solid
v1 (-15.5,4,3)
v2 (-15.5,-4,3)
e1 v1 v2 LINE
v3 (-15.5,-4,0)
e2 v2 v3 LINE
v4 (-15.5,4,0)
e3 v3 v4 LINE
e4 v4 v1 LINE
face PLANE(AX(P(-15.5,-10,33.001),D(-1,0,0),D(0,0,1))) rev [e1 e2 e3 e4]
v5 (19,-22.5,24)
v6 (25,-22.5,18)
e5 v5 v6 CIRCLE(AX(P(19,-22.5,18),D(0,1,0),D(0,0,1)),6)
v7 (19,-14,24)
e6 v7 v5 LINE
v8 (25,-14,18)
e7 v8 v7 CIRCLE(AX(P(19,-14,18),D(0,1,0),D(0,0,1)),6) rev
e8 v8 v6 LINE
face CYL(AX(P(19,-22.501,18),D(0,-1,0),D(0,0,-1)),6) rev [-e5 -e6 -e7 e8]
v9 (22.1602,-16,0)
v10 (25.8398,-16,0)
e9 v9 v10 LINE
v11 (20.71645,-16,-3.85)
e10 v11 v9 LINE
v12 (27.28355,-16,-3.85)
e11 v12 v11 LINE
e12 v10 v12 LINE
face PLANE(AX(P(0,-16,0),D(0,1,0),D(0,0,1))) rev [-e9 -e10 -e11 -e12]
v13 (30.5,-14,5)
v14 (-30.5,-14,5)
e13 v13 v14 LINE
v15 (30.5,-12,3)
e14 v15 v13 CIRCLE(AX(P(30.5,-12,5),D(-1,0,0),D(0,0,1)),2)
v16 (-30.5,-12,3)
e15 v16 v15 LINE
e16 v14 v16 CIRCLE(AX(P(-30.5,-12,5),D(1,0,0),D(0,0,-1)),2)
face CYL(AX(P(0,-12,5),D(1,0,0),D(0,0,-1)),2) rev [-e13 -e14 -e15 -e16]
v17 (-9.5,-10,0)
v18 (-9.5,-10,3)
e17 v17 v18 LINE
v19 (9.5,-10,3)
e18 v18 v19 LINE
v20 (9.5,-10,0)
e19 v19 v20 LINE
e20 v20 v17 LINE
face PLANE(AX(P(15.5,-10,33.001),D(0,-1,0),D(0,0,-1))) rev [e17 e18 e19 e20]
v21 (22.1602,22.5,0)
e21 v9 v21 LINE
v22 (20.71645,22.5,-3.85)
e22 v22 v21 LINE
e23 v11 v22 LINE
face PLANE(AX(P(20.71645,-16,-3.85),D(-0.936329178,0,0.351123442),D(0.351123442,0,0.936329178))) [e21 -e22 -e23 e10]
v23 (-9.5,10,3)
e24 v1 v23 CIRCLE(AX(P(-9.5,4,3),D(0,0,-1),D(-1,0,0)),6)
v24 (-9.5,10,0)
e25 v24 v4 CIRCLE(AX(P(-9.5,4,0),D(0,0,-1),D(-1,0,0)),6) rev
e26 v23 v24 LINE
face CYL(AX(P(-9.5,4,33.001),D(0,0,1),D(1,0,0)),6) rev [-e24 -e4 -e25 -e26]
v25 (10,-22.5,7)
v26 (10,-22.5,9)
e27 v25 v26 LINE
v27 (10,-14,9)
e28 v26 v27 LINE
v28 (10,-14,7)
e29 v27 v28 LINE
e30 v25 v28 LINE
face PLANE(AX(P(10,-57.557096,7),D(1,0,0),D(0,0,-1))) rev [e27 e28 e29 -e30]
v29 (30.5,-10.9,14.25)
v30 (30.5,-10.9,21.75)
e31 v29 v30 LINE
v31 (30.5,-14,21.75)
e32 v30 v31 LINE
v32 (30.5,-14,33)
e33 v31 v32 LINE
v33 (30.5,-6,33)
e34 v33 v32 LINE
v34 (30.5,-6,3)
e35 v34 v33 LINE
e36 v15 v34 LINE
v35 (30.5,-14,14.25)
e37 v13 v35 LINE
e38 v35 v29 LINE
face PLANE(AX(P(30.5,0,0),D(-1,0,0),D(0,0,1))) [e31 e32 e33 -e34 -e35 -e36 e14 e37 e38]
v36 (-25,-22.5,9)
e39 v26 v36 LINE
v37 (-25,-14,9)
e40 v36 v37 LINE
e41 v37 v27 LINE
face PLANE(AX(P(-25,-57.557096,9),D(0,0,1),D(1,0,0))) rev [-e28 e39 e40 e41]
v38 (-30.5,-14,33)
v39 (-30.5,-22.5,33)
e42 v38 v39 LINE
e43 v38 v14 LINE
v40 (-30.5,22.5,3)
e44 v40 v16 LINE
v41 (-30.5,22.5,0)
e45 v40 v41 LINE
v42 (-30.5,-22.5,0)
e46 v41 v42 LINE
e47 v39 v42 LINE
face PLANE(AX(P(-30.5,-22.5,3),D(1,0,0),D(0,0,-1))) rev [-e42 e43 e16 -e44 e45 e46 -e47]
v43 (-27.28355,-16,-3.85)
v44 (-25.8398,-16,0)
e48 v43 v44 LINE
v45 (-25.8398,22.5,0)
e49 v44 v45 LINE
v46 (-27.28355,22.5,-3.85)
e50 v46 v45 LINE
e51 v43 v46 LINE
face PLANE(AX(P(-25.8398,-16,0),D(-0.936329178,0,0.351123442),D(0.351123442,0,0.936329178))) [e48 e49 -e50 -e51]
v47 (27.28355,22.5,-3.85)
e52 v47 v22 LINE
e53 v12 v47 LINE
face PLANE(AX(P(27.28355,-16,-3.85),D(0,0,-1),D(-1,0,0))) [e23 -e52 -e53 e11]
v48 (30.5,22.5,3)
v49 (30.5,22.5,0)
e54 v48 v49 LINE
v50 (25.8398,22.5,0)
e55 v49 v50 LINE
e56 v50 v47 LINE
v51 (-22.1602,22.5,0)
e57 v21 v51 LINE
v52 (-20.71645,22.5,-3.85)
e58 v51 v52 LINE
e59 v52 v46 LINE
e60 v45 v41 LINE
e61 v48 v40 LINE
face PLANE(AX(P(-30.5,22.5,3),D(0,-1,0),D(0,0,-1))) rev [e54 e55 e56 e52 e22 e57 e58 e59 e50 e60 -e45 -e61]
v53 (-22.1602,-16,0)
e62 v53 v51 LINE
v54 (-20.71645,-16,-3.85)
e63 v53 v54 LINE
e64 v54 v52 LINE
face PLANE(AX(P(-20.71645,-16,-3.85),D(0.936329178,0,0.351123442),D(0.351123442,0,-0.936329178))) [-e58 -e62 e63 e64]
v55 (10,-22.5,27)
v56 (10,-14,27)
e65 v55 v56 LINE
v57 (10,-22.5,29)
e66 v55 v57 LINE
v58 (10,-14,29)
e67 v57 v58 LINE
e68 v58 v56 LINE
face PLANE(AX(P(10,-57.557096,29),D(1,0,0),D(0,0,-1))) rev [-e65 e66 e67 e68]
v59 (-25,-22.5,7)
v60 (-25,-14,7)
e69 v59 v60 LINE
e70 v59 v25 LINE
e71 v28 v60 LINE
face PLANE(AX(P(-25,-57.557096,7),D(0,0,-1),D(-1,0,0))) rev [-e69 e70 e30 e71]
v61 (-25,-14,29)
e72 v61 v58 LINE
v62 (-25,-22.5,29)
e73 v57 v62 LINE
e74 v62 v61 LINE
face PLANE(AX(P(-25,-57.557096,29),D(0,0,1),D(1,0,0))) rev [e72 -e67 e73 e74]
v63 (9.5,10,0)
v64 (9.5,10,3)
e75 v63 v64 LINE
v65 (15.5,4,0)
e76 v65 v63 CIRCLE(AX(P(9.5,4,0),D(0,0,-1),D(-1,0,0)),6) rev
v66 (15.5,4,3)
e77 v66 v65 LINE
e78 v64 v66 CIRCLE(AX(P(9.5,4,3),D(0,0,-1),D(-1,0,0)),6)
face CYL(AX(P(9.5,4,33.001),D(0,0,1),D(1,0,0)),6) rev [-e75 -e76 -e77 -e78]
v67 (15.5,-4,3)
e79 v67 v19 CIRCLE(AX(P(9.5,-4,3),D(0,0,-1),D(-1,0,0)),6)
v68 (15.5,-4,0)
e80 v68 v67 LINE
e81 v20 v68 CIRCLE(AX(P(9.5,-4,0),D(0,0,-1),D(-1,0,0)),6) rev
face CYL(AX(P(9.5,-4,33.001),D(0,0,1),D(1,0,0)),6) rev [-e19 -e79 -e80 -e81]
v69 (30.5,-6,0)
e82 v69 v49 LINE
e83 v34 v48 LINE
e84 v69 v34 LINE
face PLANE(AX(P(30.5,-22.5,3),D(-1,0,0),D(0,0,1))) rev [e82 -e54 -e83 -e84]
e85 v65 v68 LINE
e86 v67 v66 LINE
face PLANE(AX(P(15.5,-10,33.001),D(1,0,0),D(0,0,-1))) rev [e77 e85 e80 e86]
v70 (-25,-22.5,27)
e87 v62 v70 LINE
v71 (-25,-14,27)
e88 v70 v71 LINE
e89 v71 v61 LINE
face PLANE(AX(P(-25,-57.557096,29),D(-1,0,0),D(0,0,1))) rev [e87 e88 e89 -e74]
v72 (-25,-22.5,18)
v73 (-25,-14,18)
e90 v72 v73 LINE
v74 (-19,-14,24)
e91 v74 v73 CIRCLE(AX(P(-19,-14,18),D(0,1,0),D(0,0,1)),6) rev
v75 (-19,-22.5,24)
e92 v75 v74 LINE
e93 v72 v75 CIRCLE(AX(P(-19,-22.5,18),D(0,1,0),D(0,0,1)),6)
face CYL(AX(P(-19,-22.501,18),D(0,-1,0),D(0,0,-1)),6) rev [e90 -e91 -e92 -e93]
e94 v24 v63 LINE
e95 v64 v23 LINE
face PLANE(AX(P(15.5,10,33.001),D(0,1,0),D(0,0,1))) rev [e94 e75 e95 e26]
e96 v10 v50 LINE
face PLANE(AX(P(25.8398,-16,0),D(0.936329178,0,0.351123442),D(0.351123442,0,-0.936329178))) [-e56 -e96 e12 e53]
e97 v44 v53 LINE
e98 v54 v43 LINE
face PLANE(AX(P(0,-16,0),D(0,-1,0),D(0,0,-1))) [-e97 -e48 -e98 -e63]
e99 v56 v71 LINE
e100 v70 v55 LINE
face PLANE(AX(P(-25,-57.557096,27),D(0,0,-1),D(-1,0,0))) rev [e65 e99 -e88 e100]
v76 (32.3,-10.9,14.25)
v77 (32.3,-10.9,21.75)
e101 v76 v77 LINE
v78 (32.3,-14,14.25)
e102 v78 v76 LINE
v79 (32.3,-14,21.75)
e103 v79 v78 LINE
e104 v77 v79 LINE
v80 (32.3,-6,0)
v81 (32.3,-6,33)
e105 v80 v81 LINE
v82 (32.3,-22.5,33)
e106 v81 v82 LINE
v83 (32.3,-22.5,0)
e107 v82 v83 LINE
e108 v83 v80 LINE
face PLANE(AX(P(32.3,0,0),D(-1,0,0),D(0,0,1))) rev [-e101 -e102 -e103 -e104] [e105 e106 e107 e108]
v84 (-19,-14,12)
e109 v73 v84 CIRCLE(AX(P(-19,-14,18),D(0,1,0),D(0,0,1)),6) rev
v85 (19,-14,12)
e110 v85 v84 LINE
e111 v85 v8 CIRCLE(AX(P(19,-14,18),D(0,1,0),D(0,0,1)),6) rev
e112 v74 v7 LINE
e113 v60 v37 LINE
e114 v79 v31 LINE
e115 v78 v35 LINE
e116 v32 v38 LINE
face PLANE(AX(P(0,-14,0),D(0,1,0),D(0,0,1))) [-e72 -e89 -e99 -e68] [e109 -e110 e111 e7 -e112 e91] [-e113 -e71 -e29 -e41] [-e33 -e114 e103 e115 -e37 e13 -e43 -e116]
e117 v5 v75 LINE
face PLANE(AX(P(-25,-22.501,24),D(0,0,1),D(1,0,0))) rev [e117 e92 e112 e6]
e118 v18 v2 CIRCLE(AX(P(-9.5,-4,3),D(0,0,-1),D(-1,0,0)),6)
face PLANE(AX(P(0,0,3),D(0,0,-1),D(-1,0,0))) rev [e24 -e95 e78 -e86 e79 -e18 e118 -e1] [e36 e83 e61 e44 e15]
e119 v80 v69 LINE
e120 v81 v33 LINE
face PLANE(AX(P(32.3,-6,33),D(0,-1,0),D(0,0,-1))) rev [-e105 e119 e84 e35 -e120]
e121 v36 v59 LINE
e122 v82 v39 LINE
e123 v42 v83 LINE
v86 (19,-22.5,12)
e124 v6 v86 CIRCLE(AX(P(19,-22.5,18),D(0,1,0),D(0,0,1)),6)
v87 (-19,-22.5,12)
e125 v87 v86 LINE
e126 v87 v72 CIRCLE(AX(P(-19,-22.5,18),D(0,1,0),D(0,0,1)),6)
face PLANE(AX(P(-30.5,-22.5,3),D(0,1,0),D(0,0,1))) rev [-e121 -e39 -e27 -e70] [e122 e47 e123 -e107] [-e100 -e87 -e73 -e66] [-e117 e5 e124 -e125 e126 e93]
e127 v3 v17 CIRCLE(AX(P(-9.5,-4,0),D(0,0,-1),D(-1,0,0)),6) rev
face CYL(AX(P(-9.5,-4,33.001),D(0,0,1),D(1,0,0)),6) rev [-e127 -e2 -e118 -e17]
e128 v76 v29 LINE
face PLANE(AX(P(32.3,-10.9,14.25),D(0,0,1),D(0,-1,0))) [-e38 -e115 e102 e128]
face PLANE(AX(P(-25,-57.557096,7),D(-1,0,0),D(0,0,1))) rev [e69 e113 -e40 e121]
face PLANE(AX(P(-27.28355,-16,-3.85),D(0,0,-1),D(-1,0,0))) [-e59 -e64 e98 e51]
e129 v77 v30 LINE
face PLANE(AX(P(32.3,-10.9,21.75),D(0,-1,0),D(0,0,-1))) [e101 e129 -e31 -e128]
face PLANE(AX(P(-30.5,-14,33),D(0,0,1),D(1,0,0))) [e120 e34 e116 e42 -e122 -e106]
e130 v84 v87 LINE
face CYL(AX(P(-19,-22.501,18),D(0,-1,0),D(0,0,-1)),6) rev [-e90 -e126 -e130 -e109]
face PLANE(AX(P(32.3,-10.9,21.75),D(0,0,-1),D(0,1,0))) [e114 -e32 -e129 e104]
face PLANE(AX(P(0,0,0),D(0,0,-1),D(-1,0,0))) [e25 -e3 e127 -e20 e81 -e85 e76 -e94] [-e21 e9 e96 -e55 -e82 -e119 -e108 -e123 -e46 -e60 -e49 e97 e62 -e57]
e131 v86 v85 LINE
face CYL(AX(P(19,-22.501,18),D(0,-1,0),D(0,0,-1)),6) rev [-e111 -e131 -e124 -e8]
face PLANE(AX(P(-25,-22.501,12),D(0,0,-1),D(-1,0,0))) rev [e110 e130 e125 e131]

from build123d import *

# Parameters (mm, degrees)
SKETCH1_W           = 61
SKETCH1_H           = 45
BOSS_EXTRUDE1_DEPTH = 3
BOSS_EXTRUDE2_DEPTH = 38.5
SKETCH3_W           = 61
SKETCH3_H           = 30
BOSS_EXTRUDE3_DEPTH = 8.5
SKETCH4_W           = 35
SKETCH4_H           = 2
CUT_EXTRUDE1_DEPTH  = 8.5
SKETCH5_W           = 33
SKETCH5_H           = 16.5
SKETCH5_W_2         = 7.5
SKETCH5_H_2         = 3.1
BOSS_EXTRUDE4_DEPTH = 1.8
CUT_EXTRUDE2_REACH  = 60.86
SKETCH6_W           = 50
SKETCH6_H           = 12
CUT_EXTRUDE3_REACH  = 53.367
SKETCH7_W           = 31
SKETCH7_H           = 20
FILLET1_R           = 6
FILLET2_R           = 2


with BuildPart() as part:
    # Sketch1 → Boss-Extrude1 (new body)
    with BuildSketch(Plane.XY):
        Rectangle(SKETCH1_W, SKETCH1_H)
    extrude(amount=BOSS_EXTRUDE1_DEPTH)

    # Sketch2 → Boss-Extrude2 (add)
    with BuildSketch(Plane(origin=(0, 22.5, 0), x_dir=(1, 0, 0), z_dir=(0, 1, 0))):
        Polygon((-25.83979993, 0), (-27.28354993, 3.85), (-20.71645007, 3.85), (-22.16020007, 0), align=None)
        Polygon((20.71645007, 3.85), (22.16020007, 0), (25.83979993, 0), (27.28354993, 3.85), align=None)
    extrude(amount=-BOSS_EXTRUDE2_DEPTH)

    # Sketch3 → Boss-Extrude3 (add)
    with BuildSketch(Plane.XZ.offset(22.5)):
        with Locations((0, 18)):
            Rectangle(SKETCH3_W, SKETCH3_H)
    extrude(amount=-BOSS_EXTRUDE3_DEPTH)

    # Sketch4 → Cut-Extrude1 (cut)
    with BuildSketch(Plane(origin=(0, -14, 0), x_dir=(1, 0, 0), z_dir=(0, 1, 0))):
        with Locations((-7.5, -8)):
            Rectangle(SKETCH4_W, SKETCH4_H)
        with Locations((-7.5, -28)):
            Rectangle(SKETCH4_W, SKETCH4_H)
    extrude(amount=-CUT_EXTRUDE1_DEPTH, mode=Mode.SUBTRACT)

    # Sketch5 → Boss-Extrude4 (add)
    with BuildSketch(Plane(origin=(30.5, 0, 0), x_dir=(0, 0, -1), z_dir=(1, 0, 0))):
        with Locations((-16.5, -14.25)):
            Rectangle(SKETCH5_W, SKETCH5_H)
        with Locations((-18, -12.45)):
            Rectangle(SKETCH5_W_2, SKETCH5_H_2, mode=Mode.SUBTRACT)
    extrude(amount=BOSS_EXTRUDE4_DEPTH)

    # Sketch6 → Cut-Extrude2 (cut, up to next)
    with BuildSketch(Plane(origin=(0, -14, 0), x_dir=(1, 0, 0), z_dir=(0, 1, 0)), mode=Mode.PRIVATE) as cut_extrude2_sk1:
        with Locations((0, -18)):
            Rectangle(SKETCH6_W, SKETCH6_H)
    cut_extrude2_tool1 = extrude(cut_extrude2_sk1.sketch, amount=-CUT_EXTRUDE2_REACH, mode=Mode.PRIVATE) & part.part
    add(cut_extrude2_tool1.solids().sort_by_distance((0, -14, 18))[0], mode=Mode.SUBTRACT)

    # Sketch7 → Cut-Extrude3 (cut, up to next)
    with BuildSketch(Plane(origin=(0, 0, 0), x_dir=(-1, 0, 0), z_dir=(0, 0, -1)), mode=Mode.PRIVATE) as cut_extrude3_sk1:
        Rectangle(SKETCH7_W, SKETCH7_H)
    cut_extrude3_tool1 = extrude(cut_extrude3_sk1.sketch, amount=-CUT_EXTRUDE3_REACH, mode=Mode.PRIVATE) & part.part
    add(cut_extrude3_tool1.solids().sort_by_distance((0, 0, 0))[0], mode=Mode.SUBTRACT)

    # Fillet1
    fillet1_edges = [part.edges().sort_by_distance(p)[0] for p in [
        (-25, -18.25, 24),
        (-25, -18.25, 12),
        (25, -18.25, 24),
        (25, -18.25, 12),
        (-15.5, -10, 1.5),
        (-15.5, 10, 1.5),
        (15.5, 10, 1.5),
        (15.5, -10, 1.5),
    ]]
    fillet(fillet1_edges, radius=FILLET1_R - 0.0001)  # a hair under: the kernel refuses the full size

    # Fillet2
    fillet2_edges = [part.edges().sort_by_distance(p)[0] for p in [
        (0, -14, 3),
    ]]
    fillet(fillet2_edges, radius=FILLET2_R)


solid = part.part
